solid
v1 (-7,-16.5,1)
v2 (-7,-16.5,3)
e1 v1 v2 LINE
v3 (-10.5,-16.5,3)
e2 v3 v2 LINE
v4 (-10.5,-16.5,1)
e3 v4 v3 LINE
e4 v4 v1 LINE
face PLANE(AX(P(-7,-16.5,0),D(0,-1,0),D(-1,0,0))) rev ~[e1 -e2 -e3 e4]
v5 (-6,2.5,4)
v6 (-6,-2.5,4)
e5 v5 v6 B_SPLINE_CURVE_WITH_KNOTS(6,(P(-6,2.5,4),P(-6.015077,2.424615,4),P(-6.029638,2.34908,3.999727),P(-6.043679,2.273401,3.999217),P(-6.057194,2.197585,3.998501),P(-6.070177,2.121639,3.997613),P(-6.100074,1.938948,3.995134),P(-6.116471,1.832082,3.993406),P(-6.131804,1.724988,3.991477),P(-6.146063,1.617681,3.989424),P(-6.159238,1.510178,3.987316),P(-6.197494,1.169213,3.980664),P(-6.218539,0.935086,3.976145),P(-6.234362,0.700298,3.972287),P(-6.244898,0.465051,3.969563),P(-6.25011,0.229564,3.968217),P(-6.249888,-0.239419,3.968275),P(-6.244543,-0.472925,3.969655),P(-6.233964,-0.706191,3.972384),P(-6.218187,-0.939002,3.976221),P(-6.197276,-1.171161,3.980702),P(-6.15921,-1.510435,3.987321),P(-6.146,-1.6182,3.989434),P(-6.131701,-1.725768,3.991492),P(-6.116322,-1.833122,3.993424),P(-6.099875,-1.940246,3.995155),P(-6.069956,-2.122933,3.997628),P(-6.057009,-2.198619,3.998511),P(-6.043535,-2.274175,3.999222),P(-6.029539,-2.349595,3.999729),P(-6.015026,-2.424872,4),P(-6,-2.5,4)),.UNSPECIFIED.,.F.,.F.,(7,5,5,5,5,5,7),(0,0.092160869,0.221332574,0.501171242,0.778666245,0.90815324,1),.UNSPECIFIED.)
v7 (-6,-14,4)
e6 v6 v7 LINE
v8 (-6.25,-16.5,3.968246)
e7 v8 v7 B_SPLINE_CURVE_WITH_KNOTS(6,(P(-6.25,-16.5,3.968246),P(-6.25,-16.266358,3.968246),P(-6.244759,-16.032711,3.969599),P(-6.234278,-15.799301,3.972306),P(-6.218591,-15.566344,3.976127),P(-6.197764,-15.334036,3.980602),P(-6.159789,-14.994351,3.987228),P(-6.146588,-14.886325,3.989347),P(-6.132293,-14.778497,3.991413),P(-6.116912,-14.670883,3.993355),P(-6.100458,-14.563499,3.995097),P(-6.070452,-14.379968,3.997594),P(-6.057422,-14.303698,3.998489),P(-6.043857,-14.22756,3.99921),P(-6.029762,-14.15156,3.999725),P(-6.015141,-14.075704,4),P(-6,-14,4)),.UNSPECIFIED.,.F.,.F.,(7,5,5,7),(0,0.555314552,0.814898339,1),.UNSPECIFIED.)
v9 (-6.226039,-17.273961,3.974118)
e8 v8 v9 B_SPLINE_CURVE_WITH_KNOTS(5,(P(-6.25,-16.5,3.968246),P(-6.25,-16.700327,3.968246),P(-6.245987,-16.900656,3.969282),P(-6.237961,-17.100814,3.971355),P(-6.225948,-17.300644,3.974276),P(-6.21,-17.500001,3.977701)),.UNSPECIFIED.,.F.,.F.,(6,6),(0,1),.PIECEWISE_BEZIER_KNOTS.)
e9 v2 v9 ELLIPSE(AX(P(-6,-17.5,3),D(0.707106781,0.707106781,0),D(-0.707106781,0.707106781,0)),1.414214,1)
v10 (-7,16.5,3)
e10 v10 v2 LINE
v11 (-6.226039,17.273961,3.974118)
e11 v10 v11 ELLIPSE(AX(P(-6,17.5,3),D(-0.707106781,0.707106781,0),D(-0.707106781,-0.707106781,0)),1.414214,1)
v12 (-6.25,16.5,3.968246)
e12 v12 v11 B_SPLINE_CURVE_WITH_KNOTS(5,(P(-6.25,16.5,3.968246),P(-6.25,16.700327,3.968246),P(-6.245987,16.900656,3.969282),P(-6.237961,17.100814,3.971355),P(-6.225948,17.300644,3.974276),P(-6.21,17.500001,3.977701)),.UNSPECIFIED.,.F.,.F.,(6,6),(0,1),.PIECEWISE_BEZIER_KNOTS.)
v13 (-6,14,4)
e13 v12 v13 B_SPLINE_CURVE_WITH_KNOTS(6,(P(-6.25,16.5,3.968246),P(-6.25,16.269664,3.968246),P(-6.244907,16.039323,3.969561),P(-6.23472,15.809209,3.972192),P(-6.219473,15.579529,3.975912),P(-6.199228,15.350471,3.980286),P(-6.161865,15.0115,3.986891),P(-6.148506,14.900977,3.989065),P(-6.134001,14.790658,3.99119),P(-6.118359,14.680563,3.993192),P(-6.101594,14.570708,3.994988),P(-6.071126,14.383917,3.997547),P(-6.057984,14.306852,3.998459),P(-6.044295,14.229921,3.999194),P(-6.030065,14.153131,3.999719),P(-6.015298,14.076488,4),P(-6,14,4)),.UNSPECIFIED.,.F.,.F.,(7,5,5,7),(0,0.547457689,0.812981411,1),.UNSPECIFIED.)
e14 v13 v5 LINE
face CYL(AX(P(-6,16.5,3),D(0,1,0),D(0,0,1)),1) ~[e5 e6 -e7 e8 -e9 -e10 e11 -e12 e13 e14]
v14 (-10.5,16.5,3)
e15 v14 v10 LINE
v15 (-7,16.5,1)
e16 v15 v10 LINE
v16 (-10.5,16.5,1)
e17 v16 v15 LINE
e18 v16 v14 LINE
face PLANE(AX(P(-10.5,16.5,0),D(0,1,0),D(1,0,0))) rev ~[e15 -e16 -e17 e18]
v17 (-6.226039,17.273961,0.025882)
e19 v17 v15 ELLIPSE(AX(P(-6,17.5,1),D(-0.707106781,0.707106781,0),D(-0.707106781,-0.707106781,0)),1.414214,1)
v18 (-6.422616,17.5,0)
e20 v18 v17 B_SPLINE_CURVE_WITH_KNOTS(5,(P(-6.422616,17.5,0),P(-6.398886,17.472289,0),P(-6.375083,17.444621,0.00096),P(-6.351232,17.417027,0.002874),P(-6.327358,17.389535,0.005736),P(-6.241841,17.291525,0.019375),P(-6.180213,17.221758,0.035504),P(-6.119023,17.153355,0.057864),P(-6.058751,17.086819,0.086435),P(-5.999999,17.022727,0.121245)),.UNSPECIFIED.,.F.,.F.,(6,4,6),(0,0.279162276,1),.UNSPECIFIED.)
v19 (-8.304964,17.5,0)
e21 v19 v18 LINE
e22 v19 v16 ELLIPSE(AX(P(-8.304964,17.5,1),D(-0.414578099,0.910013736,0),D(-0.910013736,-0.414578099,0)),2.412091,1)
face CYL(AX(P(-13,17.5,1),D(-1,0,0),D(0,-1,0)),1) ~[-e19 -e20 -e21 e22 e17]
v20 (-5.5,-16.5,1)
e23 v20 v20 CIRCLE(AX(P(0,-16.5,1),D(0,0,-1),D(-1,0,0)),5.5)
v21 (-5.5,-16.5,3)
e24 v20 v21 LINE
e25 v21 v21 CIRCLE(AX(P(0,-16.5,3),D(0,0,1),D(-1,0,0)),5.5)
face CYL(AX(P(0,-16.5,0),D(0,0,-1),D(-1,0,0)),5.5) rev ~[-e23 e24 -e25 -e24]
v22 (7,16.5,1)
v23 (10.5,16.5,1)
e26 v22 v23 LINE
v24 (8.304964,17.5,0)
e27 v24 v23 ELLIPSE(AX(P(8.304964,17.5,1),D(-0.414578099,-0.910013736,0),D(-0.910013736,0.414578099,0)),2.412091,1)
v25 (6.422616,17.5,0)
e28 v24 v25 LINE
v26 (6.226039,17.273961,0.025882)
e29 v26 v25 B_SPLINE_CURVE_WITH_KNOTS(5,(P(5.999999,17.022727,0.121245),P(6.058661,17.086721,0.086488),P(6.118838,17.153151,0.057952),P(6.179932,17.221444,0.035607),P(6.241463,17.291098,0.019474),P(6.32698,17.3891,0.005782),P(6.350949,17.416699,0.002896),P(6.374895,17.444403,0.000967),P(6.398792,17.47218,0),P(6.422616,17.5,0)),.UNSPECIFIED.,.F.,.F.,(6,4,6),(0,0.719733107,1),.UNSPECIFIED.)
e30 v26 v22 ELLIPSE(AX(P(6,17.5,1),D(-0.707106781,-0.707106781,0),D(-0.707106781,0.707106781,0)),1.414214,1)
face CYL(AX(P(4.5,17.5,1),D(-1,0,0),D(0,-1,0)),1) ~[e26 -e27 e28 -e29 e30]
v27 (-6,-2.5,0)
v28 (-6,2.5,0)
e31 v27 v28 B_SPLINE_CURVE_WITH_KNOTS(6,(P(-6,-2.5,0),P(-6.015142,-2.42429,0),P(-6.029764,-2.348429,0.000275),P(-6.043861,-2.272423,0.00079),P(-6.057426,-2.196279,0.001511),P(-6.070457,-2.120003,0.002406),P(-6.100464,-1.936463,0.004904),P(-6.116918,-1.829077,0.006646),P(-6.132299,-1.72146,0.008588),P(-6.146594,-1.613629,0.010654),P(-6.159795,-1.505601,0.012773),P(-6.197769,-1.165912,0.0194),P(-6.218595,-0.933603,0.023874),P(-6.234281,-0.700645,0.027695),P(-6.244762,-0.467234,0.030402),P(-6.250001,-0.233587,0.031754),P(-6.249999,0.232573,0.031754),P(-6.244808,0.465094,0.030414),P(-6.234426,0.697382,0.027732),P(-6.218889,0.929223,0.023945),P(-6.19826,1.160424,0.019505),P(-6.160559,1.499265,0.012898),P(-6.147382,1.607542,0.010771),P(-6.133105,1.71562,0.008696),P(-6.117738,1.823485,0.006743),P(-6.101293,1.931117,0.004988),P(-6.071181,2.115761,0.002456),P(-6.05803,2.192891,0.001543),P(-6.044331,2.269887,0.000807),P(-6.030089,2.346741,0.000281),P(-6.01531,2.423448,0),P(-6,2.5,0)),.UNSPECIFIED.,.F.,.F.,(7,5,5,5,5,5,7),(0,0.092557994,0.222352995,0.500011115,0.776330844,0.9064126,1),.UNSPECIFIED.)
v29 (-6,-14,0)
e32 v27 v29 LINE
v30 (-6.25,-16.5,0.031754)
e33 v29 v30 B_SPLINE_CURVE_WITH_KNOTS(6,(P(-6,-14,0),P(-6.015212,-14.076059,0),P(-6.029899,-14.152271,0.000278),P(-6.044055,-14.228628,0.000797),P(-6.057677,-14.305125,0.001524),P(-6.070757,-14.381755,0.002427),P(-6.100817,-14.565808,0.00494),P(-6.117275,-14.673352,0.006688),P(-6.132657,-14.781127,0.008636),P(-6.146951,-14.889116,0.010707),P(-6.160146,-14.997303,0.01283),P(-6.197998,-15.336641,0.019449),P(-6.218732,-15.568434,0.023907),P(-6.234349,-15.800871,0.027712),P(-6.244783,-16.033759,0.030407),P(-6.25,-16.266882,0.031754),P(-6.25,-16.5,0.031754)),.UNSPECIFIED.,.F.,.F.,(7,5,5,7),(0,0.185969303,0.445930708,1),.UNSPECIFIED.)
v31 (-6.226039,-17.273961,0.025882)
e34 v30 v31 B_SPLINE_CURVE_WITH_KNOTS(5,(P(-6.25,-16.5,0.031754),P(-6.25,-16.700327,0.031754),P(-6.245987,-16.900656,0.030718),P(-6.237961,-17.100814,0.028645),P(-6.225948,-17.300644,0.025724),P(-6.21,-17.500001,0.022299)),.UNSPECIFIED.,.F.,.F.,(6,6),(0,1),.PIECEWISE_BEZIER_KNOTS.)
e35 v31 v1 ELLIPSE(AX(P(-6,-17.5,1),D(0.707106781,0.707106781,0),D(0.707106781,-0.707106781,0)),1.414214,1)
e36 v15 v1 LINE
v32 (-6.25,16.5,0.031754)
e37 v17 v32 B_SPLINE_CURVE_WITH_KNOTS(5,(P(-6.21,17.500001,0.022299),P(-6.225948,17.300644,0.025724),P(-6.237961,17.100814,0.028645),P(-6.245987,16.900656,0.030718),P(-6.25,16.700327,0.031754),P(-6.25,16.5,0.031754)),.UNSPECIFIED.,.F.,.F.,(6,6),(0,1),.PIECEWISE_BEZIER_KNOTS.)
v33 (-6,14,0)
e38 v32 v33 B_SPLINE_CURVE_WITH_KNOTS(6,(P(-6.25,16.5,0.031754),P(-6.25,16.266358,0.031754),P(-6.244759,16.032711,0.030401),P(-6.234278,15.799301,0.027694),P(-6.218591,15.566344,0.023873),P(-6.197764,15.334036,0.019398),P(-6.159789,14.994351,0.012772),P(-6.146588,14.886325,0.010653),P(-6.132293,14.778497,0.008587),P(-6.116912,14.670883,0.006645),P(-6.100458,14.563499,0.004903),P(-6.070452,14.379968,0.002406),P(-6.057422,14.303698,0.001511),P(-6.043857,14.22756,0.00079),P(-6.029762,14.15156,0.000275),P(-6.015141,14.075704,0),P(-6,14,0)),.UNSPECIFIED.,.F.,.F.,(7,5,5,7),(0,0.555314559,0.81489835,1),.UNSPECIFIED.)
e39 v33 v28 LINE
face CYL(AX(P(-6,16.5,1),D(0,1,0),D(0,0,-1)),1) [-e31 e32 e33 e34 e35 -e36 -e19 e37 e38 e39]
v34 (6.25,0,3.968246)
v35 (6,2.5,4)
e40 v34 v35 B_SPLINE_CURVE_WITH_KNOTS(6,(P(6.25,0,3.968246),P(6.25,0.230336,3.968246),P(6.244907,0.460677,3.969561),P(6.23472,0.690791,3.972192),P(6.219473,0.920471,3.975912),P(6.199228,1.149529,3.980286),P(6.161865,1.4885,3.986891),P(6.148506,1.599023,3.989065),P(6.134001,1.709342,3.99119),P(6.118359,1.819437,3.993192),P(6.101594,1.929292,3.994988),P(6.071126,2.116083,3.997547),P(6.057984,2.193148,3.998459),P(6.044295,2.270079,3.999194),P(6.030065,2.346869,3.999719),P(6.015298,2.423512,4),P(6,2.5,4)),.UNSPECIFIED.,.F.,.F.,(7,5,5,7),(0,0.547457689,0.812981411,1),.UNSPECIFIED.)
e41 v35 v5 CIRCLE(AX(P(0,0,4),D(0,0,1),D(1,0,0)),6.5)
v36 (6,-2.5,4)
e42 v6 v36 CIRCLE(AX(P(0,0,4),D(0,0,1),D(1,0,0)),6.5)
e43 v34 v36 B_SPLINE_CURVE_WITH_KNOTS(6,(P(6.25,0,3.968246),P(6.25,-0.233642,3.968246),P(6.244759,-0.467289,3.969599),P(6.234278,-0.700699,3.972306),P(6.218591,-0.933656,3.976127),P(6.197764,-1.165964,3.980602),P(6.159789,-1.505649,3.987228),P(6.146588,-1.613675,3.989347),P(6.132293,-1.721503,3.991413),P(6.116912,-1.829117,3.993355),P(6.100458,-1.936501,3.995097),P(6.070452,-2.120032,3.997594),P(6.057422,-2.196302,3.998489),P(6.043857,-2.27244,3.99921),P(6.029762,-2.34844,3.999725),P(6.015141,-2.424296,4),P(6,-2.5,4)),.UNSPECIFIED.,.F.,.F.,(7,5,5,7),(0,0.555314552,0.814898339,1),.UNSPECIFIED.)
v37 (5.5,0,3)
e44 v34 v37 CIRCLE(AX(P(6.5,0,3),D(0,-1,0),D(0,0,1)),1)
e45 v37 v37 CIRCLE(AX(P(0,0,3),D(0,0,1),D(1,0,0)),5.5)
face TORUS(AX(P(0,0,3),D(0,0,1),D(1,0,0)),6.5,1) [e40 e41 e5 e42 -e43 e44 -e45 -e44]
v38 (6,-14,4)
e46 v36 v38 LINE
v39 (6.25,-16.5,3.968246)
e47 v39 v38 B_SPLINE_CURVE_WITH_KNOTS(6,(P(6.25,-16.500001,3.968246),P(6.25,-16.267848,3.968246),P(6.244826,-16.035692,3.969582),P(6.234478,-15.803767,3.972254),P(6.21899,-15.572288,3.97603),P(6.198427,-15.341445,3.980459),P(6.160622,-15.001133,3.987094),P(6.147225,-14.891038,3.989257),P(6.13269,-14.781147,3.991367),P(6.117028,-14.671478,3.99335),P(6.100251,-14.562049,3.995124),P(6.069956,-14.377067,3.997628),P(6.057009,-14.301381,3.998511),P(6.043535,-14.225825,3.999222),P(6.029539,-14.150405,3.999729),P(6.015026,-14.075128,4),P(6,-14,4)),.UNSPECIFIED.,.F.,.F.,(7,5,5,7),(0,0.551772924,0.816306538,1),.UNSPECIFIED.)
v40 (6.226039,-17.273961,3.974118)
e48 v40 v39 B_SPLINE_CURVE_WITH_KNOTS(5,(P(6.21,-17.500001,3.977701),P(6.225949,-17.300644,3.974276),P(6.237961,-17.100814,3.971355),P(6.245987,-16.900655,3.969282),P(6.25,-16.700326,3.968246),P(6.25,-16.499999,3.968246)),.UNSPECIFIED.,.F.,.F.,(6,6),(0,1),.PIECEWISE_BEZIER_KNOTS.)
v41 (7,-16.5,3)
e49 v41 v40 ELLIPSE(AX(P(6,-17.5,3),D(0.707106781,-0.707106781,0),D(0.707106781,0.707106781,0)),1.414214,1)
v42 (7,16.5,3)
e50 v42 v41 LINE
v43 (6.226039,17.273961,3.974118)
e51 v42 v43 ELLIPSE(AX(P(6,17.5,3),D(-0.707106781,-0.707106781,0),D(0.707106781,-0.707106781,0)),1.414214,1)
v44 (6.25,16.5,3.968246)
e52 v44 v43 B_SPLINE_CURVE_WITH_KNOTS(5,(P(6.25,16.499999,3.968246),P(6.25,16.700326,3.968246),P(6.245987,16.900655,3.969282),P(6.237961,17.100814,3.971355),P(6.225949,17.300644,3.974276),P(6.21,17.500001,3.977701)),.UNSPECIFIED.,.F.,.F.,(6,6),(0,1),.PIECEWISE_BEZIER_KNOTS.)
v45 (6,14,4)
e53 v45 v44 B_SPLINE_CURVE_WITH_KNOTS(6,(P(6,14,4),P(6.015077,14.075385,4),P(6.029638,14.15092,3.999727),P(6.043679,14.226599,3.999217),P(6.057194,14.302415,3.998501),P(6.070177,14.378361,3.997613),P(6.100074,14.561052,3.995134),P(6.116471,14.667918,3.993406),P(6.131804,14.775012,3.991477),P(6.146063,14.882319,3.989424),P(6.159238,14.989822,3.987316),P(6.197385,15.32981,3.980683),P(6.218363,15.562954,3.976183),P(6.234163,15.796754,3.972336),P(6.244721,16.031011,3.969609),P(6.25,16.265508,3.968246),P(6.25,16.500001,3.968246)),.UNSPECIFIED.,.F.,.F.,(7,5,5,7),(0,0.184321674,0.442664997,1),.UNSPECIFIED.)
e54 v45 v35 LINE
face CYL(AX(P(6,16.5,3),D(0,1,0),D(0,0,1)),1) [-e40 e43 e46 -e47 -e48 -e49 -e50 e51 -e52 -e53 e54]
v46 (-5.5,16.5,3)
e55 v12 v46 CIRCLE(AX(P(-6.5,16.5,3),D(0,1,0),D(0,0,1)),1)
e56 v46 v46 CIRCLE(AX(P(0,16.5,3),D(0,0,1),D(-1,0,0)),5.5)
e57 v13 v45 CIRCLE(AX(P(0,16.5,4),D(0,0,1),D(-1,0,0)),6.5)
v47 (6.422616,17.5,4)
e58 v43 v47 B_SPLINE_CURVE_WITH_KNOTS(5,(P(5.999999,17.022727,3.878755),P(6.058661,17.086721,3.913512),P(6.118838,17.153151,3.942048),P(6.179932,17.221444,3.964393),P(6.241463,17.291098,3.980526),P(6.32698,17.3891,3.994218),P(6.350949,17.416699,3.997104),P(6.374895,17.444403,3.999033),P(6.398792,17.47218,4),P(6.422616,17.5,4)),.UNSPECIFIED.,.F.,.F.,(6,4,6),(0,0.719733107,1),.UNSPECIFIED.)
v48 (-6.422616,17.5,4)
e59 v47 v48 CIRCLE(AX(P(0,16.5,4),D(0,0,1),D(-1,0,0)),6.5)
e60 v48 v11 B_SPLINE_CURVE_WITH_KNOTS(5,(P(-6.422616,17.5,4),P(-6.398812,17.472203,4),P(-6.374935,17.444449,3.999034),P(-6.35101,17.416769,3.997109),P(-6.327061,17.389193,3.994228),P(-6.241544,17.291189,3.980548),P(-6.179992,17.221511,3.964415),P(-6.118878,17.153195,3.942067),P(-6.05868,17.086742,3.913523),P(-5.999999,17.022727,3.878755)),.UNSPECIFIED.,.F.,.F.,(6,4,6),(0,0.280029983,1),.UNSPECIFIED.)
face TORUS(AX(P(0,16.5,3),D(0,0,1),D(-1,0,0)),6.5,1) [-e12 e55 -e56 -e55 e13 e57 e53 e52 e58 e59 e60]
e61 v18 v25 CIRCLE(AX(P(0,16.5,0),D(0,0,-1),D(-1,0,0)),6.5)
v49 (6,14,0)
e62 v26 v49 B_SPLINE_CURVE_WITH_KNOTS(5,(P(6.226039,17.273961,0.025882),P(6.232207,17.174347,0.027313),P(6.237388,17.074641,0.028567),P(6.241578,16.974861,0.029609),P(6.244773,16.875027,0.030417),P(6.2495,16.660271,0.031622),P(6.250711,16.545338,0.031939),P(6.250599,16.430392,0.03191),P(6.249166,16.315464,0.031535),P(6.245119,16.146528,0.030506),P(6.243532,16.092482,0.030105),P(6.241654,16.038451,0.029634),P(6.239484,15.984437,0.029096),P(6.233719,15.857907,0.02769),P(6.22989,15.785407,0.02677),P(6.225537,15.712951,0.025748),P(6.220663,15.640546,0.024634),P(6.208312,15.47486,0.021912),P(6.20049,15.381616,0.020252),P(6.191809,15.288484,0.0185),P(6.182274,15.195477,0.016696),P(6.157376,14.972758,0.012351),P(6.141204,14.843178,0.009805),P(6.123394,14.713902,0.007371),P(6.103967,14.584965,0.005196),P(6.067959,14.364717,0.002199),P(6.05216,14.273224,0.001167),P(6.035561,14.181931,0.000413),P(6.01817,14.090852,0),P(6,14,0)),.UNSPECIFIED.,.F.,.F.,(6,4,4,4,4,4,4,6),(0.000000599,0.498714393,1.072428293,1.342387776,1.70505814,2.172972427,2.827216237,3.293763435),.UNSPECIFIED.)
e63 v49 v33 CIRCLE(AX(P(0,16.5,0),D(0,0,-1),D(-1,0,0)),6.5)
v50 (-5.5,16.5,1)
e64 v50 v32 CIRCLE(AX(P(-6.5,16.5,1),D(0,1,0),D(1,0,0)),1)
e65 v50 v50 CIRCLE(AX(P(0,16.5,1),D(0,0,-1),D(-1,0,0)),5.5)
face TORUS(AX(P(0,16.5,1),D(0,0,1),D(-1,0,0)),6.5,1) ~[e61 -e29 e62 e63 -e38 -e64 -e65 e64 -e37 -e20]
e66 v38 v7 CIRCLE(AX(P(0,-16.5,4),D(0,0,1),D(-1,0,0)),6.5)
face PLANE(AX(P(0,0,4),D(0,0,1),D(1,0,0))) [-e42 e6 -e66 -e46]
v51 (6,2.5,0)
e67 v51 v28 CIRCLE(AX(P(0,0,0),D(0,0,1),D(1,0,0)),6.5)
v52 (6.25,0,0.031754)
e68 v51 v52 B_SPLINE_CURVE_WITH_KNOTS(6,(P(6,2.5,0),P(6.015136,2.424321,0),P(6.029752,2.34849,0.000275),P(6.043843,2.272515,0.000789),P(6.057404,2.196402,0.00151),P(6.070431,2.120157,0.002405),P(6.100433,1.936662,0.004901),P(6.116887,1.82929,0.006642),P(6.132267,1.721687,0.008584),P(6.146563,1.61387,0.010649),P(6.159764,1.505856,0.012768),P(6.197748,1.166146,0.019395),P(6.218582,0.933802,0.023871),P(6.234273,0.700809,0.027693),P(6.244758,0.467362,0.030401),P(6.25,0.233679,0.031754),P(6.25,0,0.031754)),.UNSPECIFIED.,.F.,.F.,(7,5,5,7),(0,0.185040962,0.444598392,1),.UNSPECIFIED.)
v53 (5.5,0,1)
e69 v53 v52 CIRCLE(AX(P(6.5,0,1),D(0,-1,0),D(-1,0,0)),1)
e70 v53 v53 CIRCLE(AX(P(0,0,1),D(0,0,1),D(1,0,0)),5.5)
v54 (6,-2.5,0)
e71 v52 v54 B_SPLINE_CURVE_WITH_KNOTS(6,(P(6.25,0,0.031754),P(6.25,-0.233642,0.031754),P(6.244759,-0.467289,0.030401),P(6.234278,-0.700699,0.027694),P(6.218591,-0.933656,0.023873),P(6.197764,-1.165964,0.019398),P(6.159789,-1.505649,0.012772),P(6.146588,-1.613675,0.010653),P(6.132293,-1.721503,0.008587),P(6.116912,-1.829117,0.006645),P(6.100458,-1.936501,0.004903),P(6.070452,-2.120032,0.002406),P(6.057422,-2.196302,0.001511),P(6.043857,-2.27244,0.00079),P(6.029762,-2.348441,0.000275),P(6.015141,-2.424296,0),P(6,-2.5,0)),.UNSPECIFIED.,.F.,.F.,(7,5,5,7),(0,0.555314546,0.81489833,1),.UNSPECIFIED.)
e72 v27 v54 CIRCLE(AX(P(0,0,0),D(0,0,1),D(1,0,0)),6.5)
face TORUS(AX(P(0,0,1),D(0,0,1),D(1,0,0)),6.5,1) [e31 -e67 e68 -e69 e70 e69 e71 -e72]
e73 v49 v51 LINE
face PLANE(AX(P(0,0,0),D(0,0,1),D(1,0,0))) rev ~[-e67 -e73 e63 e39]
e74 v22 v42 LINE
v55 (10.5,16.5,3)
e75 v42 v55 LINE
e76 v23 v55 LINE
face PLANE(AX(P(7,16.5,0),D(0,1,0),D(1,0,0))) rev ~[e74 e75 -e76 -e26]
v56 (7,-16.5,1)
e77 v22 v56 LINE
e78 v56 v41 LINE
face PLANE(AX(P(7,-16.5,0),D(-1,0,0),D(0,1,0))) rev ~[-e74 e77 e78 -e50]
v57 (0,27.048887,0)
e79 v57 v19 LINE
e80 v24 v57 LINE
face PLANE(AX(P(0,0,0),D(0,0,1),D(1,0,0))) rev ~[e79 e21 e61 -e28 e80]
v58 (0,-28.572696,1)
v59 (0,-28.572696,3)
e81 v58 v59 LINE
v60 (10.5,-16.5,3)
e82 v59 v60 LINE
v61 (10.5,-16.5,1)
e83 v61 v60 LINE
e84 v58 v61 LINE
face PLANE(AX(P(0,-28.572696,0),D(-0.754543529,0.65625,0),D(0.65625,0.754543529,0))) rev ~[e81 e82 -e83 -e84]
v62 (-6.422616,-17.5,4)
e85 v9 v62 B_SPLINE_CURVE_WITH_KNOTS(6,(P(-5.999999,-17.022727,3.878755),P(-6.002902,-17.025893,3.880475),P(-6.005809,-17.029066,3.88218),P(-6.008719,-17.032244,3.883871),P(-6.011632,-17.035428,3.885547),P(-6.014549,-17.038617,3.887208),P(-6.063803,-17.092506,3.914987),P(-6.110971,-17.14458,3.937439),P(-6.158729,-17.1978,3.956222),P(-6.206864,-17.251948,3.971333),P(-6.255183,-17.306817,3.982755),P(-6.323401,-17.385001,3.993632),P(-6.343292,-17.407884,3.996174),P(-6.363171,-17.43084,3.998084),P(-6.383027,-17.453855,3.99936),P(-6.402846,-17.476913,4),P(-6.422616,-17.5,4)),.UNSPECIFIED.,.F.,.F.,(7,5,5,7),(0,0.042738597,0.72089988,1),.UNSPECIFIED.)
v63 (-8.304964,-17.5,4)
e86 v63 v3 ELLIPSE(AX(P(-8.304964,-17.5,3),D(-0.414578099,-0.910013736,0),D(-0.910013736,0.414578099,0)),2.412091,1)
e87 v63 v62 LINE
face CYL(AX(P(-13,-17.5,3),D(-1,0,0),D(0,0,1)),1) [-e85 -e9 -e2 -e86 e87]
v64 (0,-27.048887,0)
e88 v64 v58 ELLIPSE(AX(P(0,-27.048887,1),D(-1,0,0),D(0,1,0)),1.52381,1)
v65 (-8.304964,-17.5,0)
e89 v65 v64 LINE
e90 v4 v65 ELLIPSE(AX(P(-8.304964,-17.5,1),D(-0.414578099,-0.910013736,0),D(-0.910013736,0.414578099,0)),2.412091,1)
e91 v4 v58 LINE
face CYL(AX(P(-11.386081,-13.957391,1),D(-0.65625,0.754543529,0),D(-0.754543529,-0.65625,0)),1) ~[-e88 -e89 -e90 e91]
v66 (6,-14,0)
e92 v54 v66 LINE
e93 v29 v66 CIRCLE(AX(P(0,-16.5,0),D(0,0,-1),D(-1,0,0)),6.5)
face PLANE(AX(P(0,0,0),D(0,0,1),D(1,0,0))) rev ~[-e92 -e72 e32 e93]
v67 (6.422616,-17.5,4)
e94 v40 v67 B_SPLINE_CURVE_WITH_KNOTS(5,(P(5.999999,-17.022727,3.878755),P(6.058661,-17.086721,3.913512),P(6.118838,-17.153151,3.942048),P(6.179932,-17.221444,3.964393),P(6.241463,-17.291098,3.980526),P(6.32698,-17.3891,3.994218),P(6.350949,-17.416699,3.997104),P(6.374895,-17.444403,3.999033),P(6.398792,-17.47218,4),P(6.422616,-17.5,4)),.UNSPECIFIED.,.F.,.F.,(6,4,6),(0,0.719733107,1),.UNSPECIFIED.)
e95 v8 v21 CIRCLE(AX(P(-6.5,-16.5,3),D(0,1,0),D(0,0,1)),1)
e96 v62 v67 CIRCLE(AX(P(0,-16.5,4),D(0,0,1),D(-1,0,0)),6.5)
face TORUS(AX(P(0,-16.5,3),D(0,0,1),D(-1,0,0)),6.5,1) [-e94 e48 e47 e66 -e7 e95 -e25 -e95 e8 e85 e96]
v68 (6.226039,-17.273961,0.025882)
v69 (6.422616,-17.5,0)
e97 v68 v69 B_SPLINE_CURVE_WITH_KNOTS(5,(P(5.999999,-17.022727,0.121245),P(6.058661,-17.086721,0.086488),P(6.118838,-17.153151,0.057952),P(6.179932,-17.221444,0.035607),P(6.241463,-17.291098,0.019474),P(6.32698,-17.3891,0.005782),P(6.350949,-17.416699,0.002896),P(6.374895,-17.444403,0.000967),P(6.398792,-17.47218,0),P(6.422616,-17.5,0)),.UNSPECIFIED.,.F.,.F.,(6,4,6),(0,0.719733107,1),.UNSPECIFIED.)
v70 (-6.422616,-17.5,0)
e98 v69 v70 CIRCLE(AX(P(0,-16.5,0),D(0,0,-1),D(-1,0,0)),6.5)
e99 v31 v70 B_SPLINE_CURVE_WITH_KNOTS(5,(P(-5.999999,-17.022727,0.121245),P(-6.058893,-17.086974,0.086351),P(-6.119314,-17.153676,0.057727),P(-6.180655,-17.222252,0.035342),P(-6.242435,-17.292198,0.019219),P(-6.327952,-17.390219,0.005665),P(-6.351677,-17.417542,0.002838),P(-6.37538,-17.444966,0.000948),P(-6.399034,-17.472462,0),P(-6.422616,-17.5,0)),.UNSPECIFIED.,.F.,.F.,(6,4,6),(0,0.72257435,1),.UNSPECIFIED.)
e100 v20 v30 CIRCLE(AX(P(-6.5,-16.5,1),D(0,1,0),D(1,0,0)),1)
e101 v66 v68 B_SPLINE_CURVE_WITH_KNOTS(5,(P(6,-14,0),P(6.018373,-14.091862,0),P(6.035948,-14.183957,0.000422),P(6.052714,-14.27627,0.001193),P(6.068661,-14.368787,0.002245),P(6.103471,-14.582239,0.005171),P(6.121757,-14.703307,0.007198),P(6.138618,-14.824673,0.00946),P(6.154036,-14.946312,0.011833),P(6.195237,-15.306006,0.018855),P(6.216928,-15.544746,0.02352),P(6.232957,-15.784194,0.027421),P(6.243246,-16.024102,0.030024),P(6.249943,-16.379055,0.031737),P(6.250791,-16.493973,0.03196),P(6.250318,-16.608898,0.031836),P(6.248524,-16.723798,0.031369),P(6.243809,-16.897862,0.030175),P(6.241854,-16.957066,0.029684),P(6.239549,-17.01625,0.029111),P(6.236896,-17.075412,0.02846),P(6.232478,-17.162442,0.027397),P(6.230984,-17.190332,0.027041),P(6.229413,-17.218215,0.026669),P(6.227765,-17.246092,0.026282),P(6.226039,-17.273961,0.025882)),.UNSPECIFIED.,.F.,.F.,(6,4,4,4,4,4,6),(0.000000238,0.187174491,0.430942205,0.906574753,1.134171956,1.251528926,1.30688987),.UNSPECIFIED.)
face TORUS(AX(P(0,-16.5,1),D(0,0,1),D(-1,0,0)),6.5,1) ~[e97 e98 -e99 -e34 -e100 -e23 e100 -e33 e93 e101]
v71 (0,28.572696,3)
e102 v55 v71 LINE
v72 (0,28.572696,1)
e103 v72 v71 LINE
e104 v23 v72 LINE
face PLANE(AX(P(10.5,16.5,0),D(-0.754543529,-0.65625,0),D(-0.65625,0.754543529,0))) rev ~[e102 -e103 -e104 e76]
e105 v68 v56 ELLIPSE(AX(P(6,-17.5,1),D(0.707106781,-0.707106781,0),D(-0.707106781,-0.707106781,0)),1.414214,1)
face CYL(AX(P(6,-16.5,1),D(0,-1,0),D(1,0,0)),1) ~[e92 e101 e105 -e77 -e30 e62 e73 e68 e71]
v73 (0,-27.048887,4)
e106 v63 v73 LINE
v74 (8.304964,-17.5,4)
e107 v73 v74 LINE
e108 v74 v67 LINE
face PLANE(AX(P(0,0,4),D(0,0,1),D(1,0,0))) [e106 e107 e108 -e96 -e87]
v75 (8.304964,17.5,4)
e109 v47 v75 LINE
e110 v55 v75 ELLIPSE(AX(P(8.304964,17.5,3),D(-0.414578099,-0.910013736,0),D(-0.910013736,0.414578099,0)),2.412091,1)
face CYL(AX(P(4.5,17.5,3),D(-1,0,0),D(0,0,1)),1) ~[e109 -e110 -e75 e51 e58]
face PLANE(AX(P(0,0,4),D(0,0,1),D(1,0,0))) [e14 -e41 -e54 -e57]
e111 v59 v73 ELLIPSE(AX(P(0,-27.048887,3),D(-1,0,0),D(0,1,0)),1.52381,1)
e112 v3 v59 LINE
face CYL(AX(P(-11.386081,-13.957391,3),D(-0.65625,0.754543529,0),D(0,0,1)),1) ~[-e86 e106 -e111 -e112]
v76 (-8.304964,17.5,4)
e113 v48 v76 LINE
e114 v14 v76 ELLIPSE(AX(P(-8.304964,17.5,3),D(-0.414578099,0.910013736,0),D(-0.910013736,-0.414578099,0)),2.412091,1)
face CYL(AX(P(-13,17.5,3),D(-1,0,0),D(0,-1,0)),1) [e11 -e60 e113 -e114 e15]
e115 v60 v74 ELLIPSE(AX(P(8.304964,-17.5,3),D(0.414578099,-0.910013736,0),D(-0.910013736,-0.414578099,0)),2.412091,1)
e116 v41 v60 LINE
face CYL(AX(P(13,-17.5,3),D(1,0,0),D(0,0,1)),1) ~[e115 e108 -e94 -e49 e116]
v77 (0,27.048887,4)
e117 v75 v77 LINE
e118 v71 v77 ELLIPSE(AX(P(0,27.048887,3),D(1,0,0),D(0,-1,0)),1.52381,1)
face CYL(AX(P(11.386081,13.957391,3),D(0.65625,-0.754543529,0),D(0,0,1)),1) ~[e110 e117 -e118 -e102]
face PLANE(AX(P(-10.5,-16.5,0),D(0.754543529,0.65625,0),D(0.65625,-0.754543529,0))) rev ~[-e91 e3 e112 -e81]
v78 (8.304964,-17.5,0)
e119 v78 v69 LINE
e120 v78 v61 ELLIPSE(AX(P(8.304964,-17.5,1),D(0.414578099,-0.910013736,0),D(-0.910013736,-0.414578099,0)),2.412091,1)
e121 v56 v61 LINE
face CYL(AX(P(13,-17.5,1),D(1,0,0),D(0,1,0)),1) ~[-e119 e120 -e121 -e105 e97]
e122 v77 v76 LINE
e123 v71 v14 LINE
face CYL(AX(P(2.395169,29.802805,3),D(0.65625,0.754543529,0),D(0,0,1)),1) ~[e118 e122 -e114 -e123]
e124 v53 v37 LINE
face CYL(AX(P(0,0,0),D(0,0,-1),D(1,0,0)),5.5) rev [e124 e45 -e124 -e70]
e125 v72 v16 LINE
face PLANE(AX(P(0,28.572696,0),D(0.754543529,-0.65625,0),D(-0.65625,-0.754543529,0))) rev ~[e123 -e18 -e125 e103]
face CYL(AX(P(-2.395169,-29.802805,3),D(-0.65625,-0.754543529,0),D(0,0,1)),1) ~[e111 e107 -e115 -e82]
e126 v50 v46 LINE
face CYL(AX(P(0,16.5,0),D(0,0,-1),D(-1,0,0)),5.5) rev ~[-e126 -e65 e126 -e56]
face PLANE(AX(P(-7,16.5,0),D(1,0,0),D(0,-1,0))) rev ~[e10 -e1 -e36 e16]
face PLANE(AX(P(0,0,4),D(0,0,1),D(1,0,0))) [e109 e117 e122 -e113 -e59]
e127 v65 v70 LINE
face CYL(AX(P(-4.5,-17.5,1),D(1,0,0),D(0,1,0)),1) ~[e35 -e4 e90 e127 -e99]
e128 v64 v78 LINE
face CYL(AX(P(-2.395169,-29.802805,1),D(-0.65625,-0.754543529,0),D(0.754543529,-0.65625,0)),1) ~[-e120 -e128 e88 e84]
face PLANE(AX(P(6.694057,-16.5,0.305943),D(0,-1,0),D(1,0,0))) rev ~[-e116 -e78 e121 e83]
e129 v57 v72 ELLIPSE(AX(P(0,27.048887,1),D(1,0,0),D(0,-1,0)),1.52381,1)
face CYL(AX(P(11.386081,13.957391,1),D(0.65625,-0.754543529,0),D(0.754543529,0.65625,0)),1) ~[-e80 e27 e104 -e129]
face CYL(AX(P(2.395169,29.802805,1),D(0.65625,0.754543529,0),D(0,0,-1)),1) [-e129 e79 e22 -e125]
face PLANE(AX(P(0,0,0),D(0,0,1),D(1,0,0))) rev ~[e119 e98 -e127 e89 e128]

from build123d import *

# Parameters (mm, degrees)
F0_R          = 5.5
F1_DEPTH      = 4
F2_T1_DEPTH   = 33
F2_T3_DEPTH   = 6
F2_T5_DEPTH   = 21
F2_T7_DEPTH   = 21
F2_T9_DEPTH   = 6
F2_T11_DEPTH  = 21
F2_T13_DEPTH  = 21
F2_T31_DEPTH  = 8.5
F2_T35_DEPTH  = 35.5
F2_T42_DEPTH  = 8.5
F2_T46_DEPTH  = 35.5
F2_T53_DEPTH  = 35.5
F2_T57_DEPTH  = 8.5
F2_T64_DEPTH  = 8.5
F2_T68_DEPTH  = 35.5
F2_T75_DEPTH  = 8.5
F2_T79_DEPTH  = 35.5
F2_T86_DEPTH  = 35.5
F2_T90_DEPTH  = 8.5
F2_T97_DEPTH  = 8.5
F2_T101_DEPTH = 35.5
F2_T108_DEPTH = 35.5
F2_T112_DEPTH = 8.5


# Not quite as in the source:
# - a fillet or chamfer that OpenCascade refuses, or shapes differently, is made with other operations: its cross-section is extruded or revolved along the edge and cut away or added


with BuildPart() as f1:
    # F0 (on Top) → F1 (new body)
    with BuildSketch(Plane.XY):
        Polygon((-10.5, 16.5), (-7, 16.5), (-7, -16.5), (-10.5, -16.5), (0, -28.5726964676), (10.5, -16.5), (7, -16.5), (7, 16.5), (10.5, 16.5), (0, 28.5726964676), align=None)
        with BuildLine():
            ThreePointArc((5.5, -16.5), (0, -22), (-5.5, -16.5))
            ThreePointArc((-5.5, -16.5), (0, -11), (5.5, -16.5))
        make_face(mode=Mode.SUBTRACT)
        Circle(F0_R, mode=Mode.SUBTRACT)
        with BuildLine():
            ThreePointArc((5.5, 16.5), (0, 11), (-5.5, 16.5))
            ThreePointArc((-5.5, 16.5), (0, 22), (5.5, 16.5))
        make_face(mode=Mode.SUBTRACT)
    extrude(amount=F1_DEPTH)

    # F2: fillet of radius 1 on 28 edges, made by hand

    # F2_s2 → F2_t1 (cut)
    with BuildSketch(Plane.XZ.offset(-16.5)):
        with BuildLine():
            ThreePointArc((-6, 0), (-6.7071067812, 0.2928932188), (-7, 1))
            Line((-7, 1), (-7, 0))
            Line((-7, 0), (-6, 0))
        make_face()
        with BuildLine():
            ThreePointArc((7, 1), (6.7071067812, 0.2928932188), (6, 0))
            Line((6, 0), (7, 0))
            Line((7, 0), (7, 1))
        make_face()
        with BuildLine():
            ThreePointArc((-6, 4), (-6.7071067812, 3.7071067812), (-7, 3))
            Line((-7, 3), (-7, 4))
            Line((-7, 4), (-6, 4))
        make_face()
        with BuildLine():
            ThreePointArc((6, 4), (6.7071067812, 3.7071067812), (7, 3))
            Line((7, 3), (7, 4))
            Line((7, 4), (6, 4))
        make_face()
    extrude(amount=F2_T1_DEPTH, mode=Mode.SUBTRACT)

    # F2_s4 → F2_t3 (cut)
    with BuildSketch(Plane.YZ.offset(-13)):
        with BuildLine():
            ThreePointArc((16.5, 3), (16.7928932188, 3.7071067812), (17.5, 4))
            Line((17.5, 4), (16.5, 4))
            Line((16.5, 4), (16.5, 3))
        make_face()
        with BuildLine():
            ThreePointArc((-17.5, 4), (-16.7928932188, 3.7071067812), (-16.5, 3))
            Line((-16.5, 3), (-16.5, 4))
            Line((-16.5, 4), (-17.5, 4))
        make_face()
        with BuildLine():
            ThreePointArc((16.5, 1), (16.7928932188, 0.2928932188), (17.5, 0))
            Line((17.5, 0), (16.5, 0))
            Line((16.5, 0), (16.5, 1))
        make_face()
        with BuildLine():
            ThreePointArc((-16.5, 1), (-16.7928932188, 0.2928932188), (-17.5, 0))
            Line((-17.5, 0), (-16.5, 0))
            Line((-16.5, 0), (-16.5, 1))
        make_face()
    extrude(amount=F2_T3_DEPTH, mode=Mode.SUBTRACT)

    # F2_s6 → F2_t5 (cut)
    with BuildSketch(Plane(origin=(2.0076939962, -2.3084076396, 0), x_dir=(0, 0, 1), z_dir=(0.65625, -0.7545435292, 0))):
        with BuildLine():
            ThreePointArc((4, 17.7508320569), (3.7071067812, 18.4579388381), (3, 18.7508320569))
            Line((3, 18.7508320569), (4, 18.7508320569))
            Line((4, 18.7508320569), (4, 17.7508320569))
        make_face()
        with BuildLine():
            ThreePointArc((1, 18.7508320569), (0.2928932188, 18.4579388381), (0, 17.7508320569))
            Line((0, 17.7508320569), (0, 18.7508320569))
            Line((0, 18.7508320569), (1, 18.7508320569))
        make_face()
    extrude(amount=F2_T5_DEPTH, mode=Mode.SUBTRACT)

    # F2_s8 → F2_t7 (cut)
    with BuildSketch(Plane(origin=(-15.7889439962, -18.1538217534, 0), x_dir=(0, 0, 1), z_dir=(0.65625, 0.7545435292, 0))):
        with BuildLine():
            ThreePointArc((4, 17.7508320569), (3.7071067812, 18.4579388381), (3, 18.7508320569))
            Line((3, 18.7508320569), (4, 18.7508320569))
            Line((4, 18.7508320569), (4, 17.7508320569))
        make_face()
        with BuildLine():
            ThreePointArc((1, 18.7508320569), (0.2928932188, 18.4579388381), (0, 17.7508320569))
            Line((0, 17.7508320569), (0, 18.7508320569))
            Line((0, 18.7508320569), (1, 18.7508320569))
        make_face()
    extrude(amount=F2_T7_DEPTH, mode=Mode.SUBTRACT)

    # F2_s10 → F2_t9 (cut)
    with BuildSketch(Plane.YZ.offset(7)):
        with BuildLine():
            ThreePointArc((-17.5, 4), (-16.7928932188, 3.7071067812), (-16.5, 3))
            Line((-16.5, 3), (-16.5, 4))
            Line((-16.5, 4), (-17.5, 4))
        make_face()
        with BuildLine():
            ThreePointArc((17.5, 4), (16.7928932188, 3.7071067812), (16.5, 3))
            Line((16.5, 3), (16.5, 4))
            Line((16.5, 4), (17.5, 4))
        make_face()
        with BuildLine():
            ThreePointArc((-16.5, 1), (-16.7928932188, 0.2928932188), (-17.5, 0))
            Line((-17.5, 0), (-16.5, 0))
            Line((-16.5, 0), (-16.5, 1))
        make_face()
        with BuildLine():
            ThreePointArc((16.5, 1), (16.7928932188, 0.2928932188), (17.5, 0))
            Line((17.5, 0), (16.5, 0))
            Line((16.5, 0), (16.5, 1))
        make_face()
    extrude(amount=F2_T9_DEPTH, mode=Mode.SUBTRACT)

    # F2_s12 → F2_t11 (cut)
    with BuildSketch(Plane(origin=(-2.0076939962, 2.3084076396, 0), x_dir=(0, 0, 1), z_dir=(-0.65625, 0.7545435292, 0))):
        with BuildLine():
            ThreePointArc((4, 17.7508320569), (3.7071067812, 18.4579388381), (3, 18.7508320569))
            Line((3, 18.7508320569), (4, 18.7508320569))
            Line((4, 18.7508320569), (4, 17.7508320569))
        make_face()
        with BuildLine():
            ThreePointArc((1, 18.7508320569), (0.2928932188, 18.4579388381), (0, 17.7508320569))
            Line((0, 17.7508320569), (0, 18.7508320569))
            Line((0, 18.7508320569), (1, 18.7508320569))
        make_face()
    extrude(amount=F2_T11_DEPTH, mode=Mode.SUBTRACT)

    # F2_s14 → F2_t13 (cut)
    with BuildSketch(Plane(origin=(15.7889439962, 18.1538217534, 0), x_dir=(0, 0, 1), z_dir=(-0.65625, -0.7545435292, 0))):
        with BuildLine():
            ThreePointArc((4, 17.7508320569), (3.7071067812, 18.4579388381), (3, 18.7508320569))
            Line((3, 18.7508320569), (4, 18.7508320569))
            Line((4, 18.7508320569), (4, 17.7508320569))
        make_face()
        with BuildLine():
            ThreePointArc((0, 17.7508320569), (0.2928932188, 18.4579388381), (1, 18.7508320569))
            Line((1, 18.7508320569), (0, 18.7508320569))
            Line((0, 18.7508320569), (0, 17.7508320569))
        make_face()
    extrude(amount=F2_T13_DEPTH, mode=Mode.SUBTRACT)

    # F2_s15 → F2_t16 (revolve, cut)
    with BuildSketch(Plane.XZ.offset(16.5)):
        with BuildLine():
            ThreePointArc((-6.5, 4), (-5.7928932188, 3.7071067812), (-5.5, 3))
            Line((-5.5, 3), (-5.5, 4))
            Line((-5.5, 4), (-6.5, 4))
        make_face()
    revolve(axis=Axis((0, -16.5, 4), (0, 0, 1)), mode=Mode.SUBTRACT)

    # F2_s17 → F2_t18 (revolve, cut)
    with BuildSketch(Plane.XZ):
        with BuildLine():
            ThreePointArc((6.5, 4), (5.7928932188, 3.7071067812), (5.5, 3))
            Line((5.5, 3), (5.5, 4))
            Line((5.5, 4), (6.5, 4))
        make_face()
    revolve(axis=Axis((0, 0, 4), (0, 0, 1)), mode=Mode.SUBTRACT)

    # F2_s19 → F2_t20 (revolve, cut)
    with BuildSketch(Plane.XZ.offset(-16.5)):
        with BuildLine():
            ThreePointArc((-6.5, 4), (-5.7928932188, 3.7071067812), (-5.5, 3))
            Line((-5.5, 3), (-5.5, 4))
            Line((-5.5, 4), (-6.5, 4))
        make_face()
    revolve(axis=Axis((0, 16.5, 4), (0, 0, 1)), mode=Mode.SUBTRACT)

    # F2_s21 → F2_t22 (revolve, cut)
    with BuildSketch(Plane.XZ.offset(16.5)):
        with BuildLine():
            ThreePointArc((-5.5, 1), (-5.7928932188, 0.2928932188), (-6.5, 0))
            Line((-6.5, 0), (-5.5, 0))
            Line((-5.5, 0), (-5.5, 1))
        make_face()
    revolve(axis=Axis((0, -16.5, 0), (0, 0, -1)), mode=Mode.SUBTRACT)

    # F2_s23 → F2_t24 (revolve, cut)
    with BuildSketch(Plane.XZ):
        with BuildLine():
            ThreePointArc((5.5, 1), (5.7928932188, 0.2928932188), (6.5, 0))
            Line((6.5, 0), (5.5, 0))
            Line((5.5, 0), (5.5, 1))
        make_face()
    revolve(axis=Axis((0, 0, 0), (0, 0, 1)), mode=Mode.SUBTRACT)

    # F2_s25 → F2_t26 (revolve, cut)
    with BuildSketch(Plane.XZ.offset(-16.5)):
        with BuildLine():
            ThreePointArc((-5.5, 1), (-5.7928932188, 0.2928932188), (-6.5, 0))
            Line((-6.5, 0), (-5.5, 0))
            Line((-5.5, 0), (-5.5, 1))
        make_face()
    revolve(axis=Axis((0, 16.5, 0), (0, 0, -1)), mode=Mode.SUBTRACT)


with BuildPart() as f2_tool29:
    # F2_s30 → F2_t31 (new body)
    with BuildSketch(Plane.YZ.offset(-13)):
        with BuildLine():
            ThreePointArc((16.5, 1), (16.7928932188, 0.2928932188), (17.5, 0))
            Line((17.5, 0), (16.5, 0))
            Line((16.5, 0), (16.5, 1))
        make_face()
    extrude(amount=F2_T31_DEPTH)

    split(bisect_by=Plane.YZ.offset(-7), keep=Keep.TOP)


with BuildPart() as f2_tool33:
    # F2_s34 → F2_t35 (new body)
    with BuildSketch(Plane.XZ.offset(-19)):
        with BuildLine():
            ThreePointArc((-6, 0), (-6.7071067812, 0.2928932188), (-7, 1))
            Line((-7, 1), (-7, 0))
            Line((-7, 0), (-6, 0))
        make_face()
    extrude(amount=F2_T35_DEPTH)

    split(bisect_by=Plane.XZ.offset(-16.5), keep=Keep.BOTTOM)


with BuildPart() as f2_tool29_1:
    add(f2_tool29.part)

    # F2_t37: intersect F2_tool33
    add(f2_tool33.part, mode=Mode.INTERSECT)


with BuildPart() as f1_1:
    add(f1.part)

    # F2_t27: cut F2_tool29
    add(f2_tool29_1.part, mode=Mode.SUBTRACT)


with BuildPart() as f2_tool40:
    # F2_s41 → F2_t42 (new body)
    with BuildSketch(Plane.YZ.offset(-4.5)):
        with BuildLine():
            ThreePointArc((-16.5, 1), (-16.7928932188, 0.2928932188), (-17.5, 0))
            Line((-17.5, 0), (-16.5, 0))
            Line((-16.5, 0), (-16.5, 1))
        make_face()
    extrude(amount=-F2_T42_DEPTH)

    split(bisect_by=Plane.YZ.offset(-7), keep=Keep.TOP)


with BuildPart() as f2_tool44:
    # F2_s45 → F2_t46 (new body)
    with BuildSketch(Plane.XZ.offset(-16.5)):
        with BuildLine():
            ThreePointArc((-6, 0), (-6.7071067812, 0.2928932188), (-7, 1))
            Line((-7, 1), (-7, 0))
            Line((-7, 0), (-6, 0))
        make_face()
    extrude(amount=F2_T46_DEPTH)

    split(bisect_by=Plane.XZ.offset(16.5), keep=Keep.TOP)


with BuildPart() as f2_tool40_1:
    add(f2_tool40.part)

    # F2_t48: intersect F2_tool44
    add(f2_tool44.part, mode=Mode.INTERSECT)


with BuildPart() as f1_2:
    add(f1_1.part)

    # F2_t38: cut F2_tool40
    add(f2_tool40_1.part, mode=Mode.SUBTRACT)


with BuildPart() as f2_tool51:
    # F2_s52 → F2_t53 (new body)
    with BuildSketch(Plane.XZ.offset(19)):
        with BuildLine():
            ThreePointArc((7, 1), (6.7071067812, 0.2928932188), (6, 0))
            Line((6, 0), (7, 0))
            Line((7, 0), (7, 1))
        make_face()
    extrude(amount=-F2_T53_DEPTH)

    split(bisect_by=Plane.XZ.offset(16.5), keep=Keep.TOP)


with BuildPart() as f2_tool55:
    # F2_s56 → F2_t57 (new body)
    with BuildSketch(Plane.YZ.offset(13)):
        with BuildLine():
            ThreePointArc((-16.5, 1), (-16.7928932188, 0.2928932188), (-17.5, 0))
            Line((-17.5, 0), (-16.5, 0))
            Line((-16.5, 0), (-16.5, 1))
        make_face()
    extrude(amount=-F2_T57_DEPTH)

    split(bisect_by=Plane.YZ.offset(7), keep=Keep.BOTTOM)


with BuildPart() as f2_tool51_1:
    add(f2_tool51.part)

    # F2_t59: intersect F2_tool55
    add(f2_tool55.part, mode=Mode.INTERSECT)


with BuildPart() as f1_3:
    add(f1_2.part)

    # F2_t49: cut F2_tool51
    add(f2_tool51_1.part, mode=Mode.SUBTRACT)


with BuildPart() as f2_tool62:
    # F2_s63 → F2_t64 (new body)
    with BuildSketch(Plane.YZ.offset(4.5)):
        with BuildLine():
            ThreePointArc((16.5, 1), (16.7928932188, 0.2928932188), (17.5, 0))
            Line((17.5, 0), (16.5, 0))
            Line((16.5, 0), (16.5, 1))
        make_face()
    extrude(amount=F2_T64_DEPTH)

    split(bisect_by=Plane.YZ.offset(7), keep=Keep.BOTTOM)


with BuildPart() as f2_tool66:
    # F2_s67 → F2_t68 (new body)
    with BuildSketch(Plane.XZ.offset(16.5)):
        with BuildLine():
            ThreePointArc((7, 1), (6.7071067812, 0.2928932188), (6, 0))
            Line((6, 0), (7, 0))
            Line((7, 0), (7, 1))
        make_face()
    extrude(amount=-F2_T68_DEPTH)

    split(bisect_by=Plane.XZ.offset(-16.5), keep=Keep.BOTTOM)


with BuildPart() as f2_tool62_1:
    add(f2_tool62.part)

    # F2_t70: intersect F2_tool66
    add(f2_tool66.part, mode=Mode.INTERSECT)


with BuildPart() as f1_4:
    add(f1_3.part)

    # F2_t60: cut F2_tool62
    add(f2_tool62_1.part, mode=Mode.SUBTRACT)


with BuildPart() as f2_tool73:
    # F2_s74 → F2_t75 (new body)
    with BuildSketch(Plane.YZ.offset(-13)):
        with BuildLine():
            ThreePointArc((16.5, 3), (16.7928932188, 3.7071067812), (17.5, 4))
            Line((17.5, 4), (16.5, 4))
            Line((16.5, 4), (16.5, 3))
        make_face()
    extrude(amount=F2_T75_DEPTH)

    split(bisect_by=Plane.YZ.offset(-7), keep=Keep.TOP)


with BuildPart() as f2_tool77:
    # F2_s78 → F2_t79 (new body)
    with BuildSketch(Plane.XZ.offset(-19)):
        with BuildLine():
            ThreePointArc((-6, 4), (-6.7071067812, 3.7071067812), (-7, 3))
            Line((-7, 3), (-7, 4))
            Line((-7, 4), (-6, 4))
        make_face()
    extrude(amount=F2_T79_DEPTH)

    split(bisect_by=Plane.XZ.offset(-16.5), keep=Keep.BOTTOM)


with BuildPart() as f2_tool73_1:
    add(f2_tool73.part)

    # F2_t81: intersect F2_tool77
    add(f2_tool77.part, mode=Mode.INTERSECT)


with BuildPart() as f1_5:
    add(f1_4.part)

    # F2_t71: cut F2_tool73
    add(f2_tool73_1.part, mode=Mode.SUBTRACT)


with BuildPart() as f2_tool84:
    # F2_s85 → F2_t86 (new body)
    with BuildSketch(Plane.XZ.offset(-16.5)):
        with BuildLine():
            ThreePointArc((-6, 4), (-6.7071067812, 3.7071067812), (-7, 3))
            Line((-7, 3), (-7, 4))
            Line((-7, 4), (-6, 4))
        make_face()
    extrude(amount=F2_T86_DEPTH)

    split(bisect_by=Plane.XZ.offset(16.5), keep=Keep.TOP)


with BuildPart() as f2_tool88:
    # F2_s89 → F2_t90 (new body)
    with BuildSketch(Plane.YZ.offset(-4.5)):
        with BuildLine():
            ThreePointArc((-17.5, 4), (-16.7928932188, 3.7071067812), (-16.5, 3))
            Line((-16.5, 3), (-16.5, 4))
            Line((-16.5, 4), (-17.5, 4))
        make_face()
    extrude(amount=-F2_T90_DEPTH)

    split(bisect_by=Plane.YZ.offset(-7), keep=Keep.TOP)


with BuildPart() as f2_tool84_1:
    add(f2_tool84.part)

    # F2_t92: intersect F2_tool88
    add(f2_tool88.part, mode=Mode.INTERSECT)


with BuildPart() as f1_6:
    add(f1_5.part)

    # F2_t82: cut F2_tool84
    add(f2_tool84_1.part, mode=Mode.SUBTRACT)


with BuildPart() as f2_tool95:
    # F2_s96 → F2_t97 (new body)
    with BuildSketch(Plane.YZ.offset(13)):
        with BuildLine():
            ThreePointArc((-17.5, 4), (-16.7928932188, 3.7071067812), (-16.5, 3))
            Line((-16.5, 3), (-16.5, 4))
            Line((-16.5, 4), (-17.5, 4))
        make_face()
    extrude(amount=-F2_T97_DEPTH)

    split(bisect_by=Plane.YZ.offset(7), keep=Keep.BOTTOM)


with BuildPart() as f2_tool99:
    # F2_s100 → F2_t101 (new body)
    with BuildSketch(Plane.XZ.offset(19)):
        with BuildLine():
            ThreePointArc((6, 4), (6.7071067812, 3.7071067812), (7, 3))
            Line((7, 3), (7, 4))
            Line((7, 4), (6, 4))
        make_face()
    extrude(amount=-F2_T101_DEPTH)

    split(bisect_by=Plane.XZ.offset(16.5), keep=Keep.TOP)


with BuildPart() as f2_tool95_1:
    add(f2_tool95.part)

    # F2_t103: intersect F2_tool99
    add(f2_tool99.part, mode=Mode.INTERSECT)


with BuildPart() as f1_7:
    add(f1_6.part)

    # F2_t93: cut F2_tool95
    add(f2_tool95_1.part, mode=Mode.SUBTRACT)


with BuildPart() as f2_tool106:
    # F2_s107 → F2_t108 (new body)
    with BuildSketch(Plane.XZ.offset(16.5)):
        with BuildLine():
            ThreePointArc((6, 4), (6.7071067812, 3.7071067812), (7, 3))
            Line((7, 3), (7, 4))
            Line((7, 4), (6, 4))
        make_face()
    extrude(amount=-F2_T108_DEPTH)

    split(bisect_by=Plane.XZ.offset(-16.5), keep=Keep.BOTTOM)


with BuildPart() as f2_tool110:
    # F2_s111 → F2_t112 (new body)
    with BuildSketch(Plane.YZ.offset(4.5)):
        with BuildLine():
            ThreePointArc((17.5, 4), (16.7928932188, 3.7071067812), (16.5, 3))
            Line((16.5, 3), (16.5, 4))
            Line((16.5, 4), (17.5, 4))
        make_face()
    extrude(amount=F2_T112_DEPTH)

    split(bisect_by=Plane.YZ.offset(7), keep=Keep.BOTTOM)


with BuildPart() as f2_tool106_1:
    add(f2_tool106.part)

    # F2_t114: intersect F2_tool110
    add(f2_tool110.part, mode=Mode.INTERSECT)


with BuildPart() as f1_8:
    add(f1_7.part)

    # F2_t104: cut F2_tool106
    add(f2_tool106_1.part, mode=Mode.SUBTRACT)


solid = f1_8.part
